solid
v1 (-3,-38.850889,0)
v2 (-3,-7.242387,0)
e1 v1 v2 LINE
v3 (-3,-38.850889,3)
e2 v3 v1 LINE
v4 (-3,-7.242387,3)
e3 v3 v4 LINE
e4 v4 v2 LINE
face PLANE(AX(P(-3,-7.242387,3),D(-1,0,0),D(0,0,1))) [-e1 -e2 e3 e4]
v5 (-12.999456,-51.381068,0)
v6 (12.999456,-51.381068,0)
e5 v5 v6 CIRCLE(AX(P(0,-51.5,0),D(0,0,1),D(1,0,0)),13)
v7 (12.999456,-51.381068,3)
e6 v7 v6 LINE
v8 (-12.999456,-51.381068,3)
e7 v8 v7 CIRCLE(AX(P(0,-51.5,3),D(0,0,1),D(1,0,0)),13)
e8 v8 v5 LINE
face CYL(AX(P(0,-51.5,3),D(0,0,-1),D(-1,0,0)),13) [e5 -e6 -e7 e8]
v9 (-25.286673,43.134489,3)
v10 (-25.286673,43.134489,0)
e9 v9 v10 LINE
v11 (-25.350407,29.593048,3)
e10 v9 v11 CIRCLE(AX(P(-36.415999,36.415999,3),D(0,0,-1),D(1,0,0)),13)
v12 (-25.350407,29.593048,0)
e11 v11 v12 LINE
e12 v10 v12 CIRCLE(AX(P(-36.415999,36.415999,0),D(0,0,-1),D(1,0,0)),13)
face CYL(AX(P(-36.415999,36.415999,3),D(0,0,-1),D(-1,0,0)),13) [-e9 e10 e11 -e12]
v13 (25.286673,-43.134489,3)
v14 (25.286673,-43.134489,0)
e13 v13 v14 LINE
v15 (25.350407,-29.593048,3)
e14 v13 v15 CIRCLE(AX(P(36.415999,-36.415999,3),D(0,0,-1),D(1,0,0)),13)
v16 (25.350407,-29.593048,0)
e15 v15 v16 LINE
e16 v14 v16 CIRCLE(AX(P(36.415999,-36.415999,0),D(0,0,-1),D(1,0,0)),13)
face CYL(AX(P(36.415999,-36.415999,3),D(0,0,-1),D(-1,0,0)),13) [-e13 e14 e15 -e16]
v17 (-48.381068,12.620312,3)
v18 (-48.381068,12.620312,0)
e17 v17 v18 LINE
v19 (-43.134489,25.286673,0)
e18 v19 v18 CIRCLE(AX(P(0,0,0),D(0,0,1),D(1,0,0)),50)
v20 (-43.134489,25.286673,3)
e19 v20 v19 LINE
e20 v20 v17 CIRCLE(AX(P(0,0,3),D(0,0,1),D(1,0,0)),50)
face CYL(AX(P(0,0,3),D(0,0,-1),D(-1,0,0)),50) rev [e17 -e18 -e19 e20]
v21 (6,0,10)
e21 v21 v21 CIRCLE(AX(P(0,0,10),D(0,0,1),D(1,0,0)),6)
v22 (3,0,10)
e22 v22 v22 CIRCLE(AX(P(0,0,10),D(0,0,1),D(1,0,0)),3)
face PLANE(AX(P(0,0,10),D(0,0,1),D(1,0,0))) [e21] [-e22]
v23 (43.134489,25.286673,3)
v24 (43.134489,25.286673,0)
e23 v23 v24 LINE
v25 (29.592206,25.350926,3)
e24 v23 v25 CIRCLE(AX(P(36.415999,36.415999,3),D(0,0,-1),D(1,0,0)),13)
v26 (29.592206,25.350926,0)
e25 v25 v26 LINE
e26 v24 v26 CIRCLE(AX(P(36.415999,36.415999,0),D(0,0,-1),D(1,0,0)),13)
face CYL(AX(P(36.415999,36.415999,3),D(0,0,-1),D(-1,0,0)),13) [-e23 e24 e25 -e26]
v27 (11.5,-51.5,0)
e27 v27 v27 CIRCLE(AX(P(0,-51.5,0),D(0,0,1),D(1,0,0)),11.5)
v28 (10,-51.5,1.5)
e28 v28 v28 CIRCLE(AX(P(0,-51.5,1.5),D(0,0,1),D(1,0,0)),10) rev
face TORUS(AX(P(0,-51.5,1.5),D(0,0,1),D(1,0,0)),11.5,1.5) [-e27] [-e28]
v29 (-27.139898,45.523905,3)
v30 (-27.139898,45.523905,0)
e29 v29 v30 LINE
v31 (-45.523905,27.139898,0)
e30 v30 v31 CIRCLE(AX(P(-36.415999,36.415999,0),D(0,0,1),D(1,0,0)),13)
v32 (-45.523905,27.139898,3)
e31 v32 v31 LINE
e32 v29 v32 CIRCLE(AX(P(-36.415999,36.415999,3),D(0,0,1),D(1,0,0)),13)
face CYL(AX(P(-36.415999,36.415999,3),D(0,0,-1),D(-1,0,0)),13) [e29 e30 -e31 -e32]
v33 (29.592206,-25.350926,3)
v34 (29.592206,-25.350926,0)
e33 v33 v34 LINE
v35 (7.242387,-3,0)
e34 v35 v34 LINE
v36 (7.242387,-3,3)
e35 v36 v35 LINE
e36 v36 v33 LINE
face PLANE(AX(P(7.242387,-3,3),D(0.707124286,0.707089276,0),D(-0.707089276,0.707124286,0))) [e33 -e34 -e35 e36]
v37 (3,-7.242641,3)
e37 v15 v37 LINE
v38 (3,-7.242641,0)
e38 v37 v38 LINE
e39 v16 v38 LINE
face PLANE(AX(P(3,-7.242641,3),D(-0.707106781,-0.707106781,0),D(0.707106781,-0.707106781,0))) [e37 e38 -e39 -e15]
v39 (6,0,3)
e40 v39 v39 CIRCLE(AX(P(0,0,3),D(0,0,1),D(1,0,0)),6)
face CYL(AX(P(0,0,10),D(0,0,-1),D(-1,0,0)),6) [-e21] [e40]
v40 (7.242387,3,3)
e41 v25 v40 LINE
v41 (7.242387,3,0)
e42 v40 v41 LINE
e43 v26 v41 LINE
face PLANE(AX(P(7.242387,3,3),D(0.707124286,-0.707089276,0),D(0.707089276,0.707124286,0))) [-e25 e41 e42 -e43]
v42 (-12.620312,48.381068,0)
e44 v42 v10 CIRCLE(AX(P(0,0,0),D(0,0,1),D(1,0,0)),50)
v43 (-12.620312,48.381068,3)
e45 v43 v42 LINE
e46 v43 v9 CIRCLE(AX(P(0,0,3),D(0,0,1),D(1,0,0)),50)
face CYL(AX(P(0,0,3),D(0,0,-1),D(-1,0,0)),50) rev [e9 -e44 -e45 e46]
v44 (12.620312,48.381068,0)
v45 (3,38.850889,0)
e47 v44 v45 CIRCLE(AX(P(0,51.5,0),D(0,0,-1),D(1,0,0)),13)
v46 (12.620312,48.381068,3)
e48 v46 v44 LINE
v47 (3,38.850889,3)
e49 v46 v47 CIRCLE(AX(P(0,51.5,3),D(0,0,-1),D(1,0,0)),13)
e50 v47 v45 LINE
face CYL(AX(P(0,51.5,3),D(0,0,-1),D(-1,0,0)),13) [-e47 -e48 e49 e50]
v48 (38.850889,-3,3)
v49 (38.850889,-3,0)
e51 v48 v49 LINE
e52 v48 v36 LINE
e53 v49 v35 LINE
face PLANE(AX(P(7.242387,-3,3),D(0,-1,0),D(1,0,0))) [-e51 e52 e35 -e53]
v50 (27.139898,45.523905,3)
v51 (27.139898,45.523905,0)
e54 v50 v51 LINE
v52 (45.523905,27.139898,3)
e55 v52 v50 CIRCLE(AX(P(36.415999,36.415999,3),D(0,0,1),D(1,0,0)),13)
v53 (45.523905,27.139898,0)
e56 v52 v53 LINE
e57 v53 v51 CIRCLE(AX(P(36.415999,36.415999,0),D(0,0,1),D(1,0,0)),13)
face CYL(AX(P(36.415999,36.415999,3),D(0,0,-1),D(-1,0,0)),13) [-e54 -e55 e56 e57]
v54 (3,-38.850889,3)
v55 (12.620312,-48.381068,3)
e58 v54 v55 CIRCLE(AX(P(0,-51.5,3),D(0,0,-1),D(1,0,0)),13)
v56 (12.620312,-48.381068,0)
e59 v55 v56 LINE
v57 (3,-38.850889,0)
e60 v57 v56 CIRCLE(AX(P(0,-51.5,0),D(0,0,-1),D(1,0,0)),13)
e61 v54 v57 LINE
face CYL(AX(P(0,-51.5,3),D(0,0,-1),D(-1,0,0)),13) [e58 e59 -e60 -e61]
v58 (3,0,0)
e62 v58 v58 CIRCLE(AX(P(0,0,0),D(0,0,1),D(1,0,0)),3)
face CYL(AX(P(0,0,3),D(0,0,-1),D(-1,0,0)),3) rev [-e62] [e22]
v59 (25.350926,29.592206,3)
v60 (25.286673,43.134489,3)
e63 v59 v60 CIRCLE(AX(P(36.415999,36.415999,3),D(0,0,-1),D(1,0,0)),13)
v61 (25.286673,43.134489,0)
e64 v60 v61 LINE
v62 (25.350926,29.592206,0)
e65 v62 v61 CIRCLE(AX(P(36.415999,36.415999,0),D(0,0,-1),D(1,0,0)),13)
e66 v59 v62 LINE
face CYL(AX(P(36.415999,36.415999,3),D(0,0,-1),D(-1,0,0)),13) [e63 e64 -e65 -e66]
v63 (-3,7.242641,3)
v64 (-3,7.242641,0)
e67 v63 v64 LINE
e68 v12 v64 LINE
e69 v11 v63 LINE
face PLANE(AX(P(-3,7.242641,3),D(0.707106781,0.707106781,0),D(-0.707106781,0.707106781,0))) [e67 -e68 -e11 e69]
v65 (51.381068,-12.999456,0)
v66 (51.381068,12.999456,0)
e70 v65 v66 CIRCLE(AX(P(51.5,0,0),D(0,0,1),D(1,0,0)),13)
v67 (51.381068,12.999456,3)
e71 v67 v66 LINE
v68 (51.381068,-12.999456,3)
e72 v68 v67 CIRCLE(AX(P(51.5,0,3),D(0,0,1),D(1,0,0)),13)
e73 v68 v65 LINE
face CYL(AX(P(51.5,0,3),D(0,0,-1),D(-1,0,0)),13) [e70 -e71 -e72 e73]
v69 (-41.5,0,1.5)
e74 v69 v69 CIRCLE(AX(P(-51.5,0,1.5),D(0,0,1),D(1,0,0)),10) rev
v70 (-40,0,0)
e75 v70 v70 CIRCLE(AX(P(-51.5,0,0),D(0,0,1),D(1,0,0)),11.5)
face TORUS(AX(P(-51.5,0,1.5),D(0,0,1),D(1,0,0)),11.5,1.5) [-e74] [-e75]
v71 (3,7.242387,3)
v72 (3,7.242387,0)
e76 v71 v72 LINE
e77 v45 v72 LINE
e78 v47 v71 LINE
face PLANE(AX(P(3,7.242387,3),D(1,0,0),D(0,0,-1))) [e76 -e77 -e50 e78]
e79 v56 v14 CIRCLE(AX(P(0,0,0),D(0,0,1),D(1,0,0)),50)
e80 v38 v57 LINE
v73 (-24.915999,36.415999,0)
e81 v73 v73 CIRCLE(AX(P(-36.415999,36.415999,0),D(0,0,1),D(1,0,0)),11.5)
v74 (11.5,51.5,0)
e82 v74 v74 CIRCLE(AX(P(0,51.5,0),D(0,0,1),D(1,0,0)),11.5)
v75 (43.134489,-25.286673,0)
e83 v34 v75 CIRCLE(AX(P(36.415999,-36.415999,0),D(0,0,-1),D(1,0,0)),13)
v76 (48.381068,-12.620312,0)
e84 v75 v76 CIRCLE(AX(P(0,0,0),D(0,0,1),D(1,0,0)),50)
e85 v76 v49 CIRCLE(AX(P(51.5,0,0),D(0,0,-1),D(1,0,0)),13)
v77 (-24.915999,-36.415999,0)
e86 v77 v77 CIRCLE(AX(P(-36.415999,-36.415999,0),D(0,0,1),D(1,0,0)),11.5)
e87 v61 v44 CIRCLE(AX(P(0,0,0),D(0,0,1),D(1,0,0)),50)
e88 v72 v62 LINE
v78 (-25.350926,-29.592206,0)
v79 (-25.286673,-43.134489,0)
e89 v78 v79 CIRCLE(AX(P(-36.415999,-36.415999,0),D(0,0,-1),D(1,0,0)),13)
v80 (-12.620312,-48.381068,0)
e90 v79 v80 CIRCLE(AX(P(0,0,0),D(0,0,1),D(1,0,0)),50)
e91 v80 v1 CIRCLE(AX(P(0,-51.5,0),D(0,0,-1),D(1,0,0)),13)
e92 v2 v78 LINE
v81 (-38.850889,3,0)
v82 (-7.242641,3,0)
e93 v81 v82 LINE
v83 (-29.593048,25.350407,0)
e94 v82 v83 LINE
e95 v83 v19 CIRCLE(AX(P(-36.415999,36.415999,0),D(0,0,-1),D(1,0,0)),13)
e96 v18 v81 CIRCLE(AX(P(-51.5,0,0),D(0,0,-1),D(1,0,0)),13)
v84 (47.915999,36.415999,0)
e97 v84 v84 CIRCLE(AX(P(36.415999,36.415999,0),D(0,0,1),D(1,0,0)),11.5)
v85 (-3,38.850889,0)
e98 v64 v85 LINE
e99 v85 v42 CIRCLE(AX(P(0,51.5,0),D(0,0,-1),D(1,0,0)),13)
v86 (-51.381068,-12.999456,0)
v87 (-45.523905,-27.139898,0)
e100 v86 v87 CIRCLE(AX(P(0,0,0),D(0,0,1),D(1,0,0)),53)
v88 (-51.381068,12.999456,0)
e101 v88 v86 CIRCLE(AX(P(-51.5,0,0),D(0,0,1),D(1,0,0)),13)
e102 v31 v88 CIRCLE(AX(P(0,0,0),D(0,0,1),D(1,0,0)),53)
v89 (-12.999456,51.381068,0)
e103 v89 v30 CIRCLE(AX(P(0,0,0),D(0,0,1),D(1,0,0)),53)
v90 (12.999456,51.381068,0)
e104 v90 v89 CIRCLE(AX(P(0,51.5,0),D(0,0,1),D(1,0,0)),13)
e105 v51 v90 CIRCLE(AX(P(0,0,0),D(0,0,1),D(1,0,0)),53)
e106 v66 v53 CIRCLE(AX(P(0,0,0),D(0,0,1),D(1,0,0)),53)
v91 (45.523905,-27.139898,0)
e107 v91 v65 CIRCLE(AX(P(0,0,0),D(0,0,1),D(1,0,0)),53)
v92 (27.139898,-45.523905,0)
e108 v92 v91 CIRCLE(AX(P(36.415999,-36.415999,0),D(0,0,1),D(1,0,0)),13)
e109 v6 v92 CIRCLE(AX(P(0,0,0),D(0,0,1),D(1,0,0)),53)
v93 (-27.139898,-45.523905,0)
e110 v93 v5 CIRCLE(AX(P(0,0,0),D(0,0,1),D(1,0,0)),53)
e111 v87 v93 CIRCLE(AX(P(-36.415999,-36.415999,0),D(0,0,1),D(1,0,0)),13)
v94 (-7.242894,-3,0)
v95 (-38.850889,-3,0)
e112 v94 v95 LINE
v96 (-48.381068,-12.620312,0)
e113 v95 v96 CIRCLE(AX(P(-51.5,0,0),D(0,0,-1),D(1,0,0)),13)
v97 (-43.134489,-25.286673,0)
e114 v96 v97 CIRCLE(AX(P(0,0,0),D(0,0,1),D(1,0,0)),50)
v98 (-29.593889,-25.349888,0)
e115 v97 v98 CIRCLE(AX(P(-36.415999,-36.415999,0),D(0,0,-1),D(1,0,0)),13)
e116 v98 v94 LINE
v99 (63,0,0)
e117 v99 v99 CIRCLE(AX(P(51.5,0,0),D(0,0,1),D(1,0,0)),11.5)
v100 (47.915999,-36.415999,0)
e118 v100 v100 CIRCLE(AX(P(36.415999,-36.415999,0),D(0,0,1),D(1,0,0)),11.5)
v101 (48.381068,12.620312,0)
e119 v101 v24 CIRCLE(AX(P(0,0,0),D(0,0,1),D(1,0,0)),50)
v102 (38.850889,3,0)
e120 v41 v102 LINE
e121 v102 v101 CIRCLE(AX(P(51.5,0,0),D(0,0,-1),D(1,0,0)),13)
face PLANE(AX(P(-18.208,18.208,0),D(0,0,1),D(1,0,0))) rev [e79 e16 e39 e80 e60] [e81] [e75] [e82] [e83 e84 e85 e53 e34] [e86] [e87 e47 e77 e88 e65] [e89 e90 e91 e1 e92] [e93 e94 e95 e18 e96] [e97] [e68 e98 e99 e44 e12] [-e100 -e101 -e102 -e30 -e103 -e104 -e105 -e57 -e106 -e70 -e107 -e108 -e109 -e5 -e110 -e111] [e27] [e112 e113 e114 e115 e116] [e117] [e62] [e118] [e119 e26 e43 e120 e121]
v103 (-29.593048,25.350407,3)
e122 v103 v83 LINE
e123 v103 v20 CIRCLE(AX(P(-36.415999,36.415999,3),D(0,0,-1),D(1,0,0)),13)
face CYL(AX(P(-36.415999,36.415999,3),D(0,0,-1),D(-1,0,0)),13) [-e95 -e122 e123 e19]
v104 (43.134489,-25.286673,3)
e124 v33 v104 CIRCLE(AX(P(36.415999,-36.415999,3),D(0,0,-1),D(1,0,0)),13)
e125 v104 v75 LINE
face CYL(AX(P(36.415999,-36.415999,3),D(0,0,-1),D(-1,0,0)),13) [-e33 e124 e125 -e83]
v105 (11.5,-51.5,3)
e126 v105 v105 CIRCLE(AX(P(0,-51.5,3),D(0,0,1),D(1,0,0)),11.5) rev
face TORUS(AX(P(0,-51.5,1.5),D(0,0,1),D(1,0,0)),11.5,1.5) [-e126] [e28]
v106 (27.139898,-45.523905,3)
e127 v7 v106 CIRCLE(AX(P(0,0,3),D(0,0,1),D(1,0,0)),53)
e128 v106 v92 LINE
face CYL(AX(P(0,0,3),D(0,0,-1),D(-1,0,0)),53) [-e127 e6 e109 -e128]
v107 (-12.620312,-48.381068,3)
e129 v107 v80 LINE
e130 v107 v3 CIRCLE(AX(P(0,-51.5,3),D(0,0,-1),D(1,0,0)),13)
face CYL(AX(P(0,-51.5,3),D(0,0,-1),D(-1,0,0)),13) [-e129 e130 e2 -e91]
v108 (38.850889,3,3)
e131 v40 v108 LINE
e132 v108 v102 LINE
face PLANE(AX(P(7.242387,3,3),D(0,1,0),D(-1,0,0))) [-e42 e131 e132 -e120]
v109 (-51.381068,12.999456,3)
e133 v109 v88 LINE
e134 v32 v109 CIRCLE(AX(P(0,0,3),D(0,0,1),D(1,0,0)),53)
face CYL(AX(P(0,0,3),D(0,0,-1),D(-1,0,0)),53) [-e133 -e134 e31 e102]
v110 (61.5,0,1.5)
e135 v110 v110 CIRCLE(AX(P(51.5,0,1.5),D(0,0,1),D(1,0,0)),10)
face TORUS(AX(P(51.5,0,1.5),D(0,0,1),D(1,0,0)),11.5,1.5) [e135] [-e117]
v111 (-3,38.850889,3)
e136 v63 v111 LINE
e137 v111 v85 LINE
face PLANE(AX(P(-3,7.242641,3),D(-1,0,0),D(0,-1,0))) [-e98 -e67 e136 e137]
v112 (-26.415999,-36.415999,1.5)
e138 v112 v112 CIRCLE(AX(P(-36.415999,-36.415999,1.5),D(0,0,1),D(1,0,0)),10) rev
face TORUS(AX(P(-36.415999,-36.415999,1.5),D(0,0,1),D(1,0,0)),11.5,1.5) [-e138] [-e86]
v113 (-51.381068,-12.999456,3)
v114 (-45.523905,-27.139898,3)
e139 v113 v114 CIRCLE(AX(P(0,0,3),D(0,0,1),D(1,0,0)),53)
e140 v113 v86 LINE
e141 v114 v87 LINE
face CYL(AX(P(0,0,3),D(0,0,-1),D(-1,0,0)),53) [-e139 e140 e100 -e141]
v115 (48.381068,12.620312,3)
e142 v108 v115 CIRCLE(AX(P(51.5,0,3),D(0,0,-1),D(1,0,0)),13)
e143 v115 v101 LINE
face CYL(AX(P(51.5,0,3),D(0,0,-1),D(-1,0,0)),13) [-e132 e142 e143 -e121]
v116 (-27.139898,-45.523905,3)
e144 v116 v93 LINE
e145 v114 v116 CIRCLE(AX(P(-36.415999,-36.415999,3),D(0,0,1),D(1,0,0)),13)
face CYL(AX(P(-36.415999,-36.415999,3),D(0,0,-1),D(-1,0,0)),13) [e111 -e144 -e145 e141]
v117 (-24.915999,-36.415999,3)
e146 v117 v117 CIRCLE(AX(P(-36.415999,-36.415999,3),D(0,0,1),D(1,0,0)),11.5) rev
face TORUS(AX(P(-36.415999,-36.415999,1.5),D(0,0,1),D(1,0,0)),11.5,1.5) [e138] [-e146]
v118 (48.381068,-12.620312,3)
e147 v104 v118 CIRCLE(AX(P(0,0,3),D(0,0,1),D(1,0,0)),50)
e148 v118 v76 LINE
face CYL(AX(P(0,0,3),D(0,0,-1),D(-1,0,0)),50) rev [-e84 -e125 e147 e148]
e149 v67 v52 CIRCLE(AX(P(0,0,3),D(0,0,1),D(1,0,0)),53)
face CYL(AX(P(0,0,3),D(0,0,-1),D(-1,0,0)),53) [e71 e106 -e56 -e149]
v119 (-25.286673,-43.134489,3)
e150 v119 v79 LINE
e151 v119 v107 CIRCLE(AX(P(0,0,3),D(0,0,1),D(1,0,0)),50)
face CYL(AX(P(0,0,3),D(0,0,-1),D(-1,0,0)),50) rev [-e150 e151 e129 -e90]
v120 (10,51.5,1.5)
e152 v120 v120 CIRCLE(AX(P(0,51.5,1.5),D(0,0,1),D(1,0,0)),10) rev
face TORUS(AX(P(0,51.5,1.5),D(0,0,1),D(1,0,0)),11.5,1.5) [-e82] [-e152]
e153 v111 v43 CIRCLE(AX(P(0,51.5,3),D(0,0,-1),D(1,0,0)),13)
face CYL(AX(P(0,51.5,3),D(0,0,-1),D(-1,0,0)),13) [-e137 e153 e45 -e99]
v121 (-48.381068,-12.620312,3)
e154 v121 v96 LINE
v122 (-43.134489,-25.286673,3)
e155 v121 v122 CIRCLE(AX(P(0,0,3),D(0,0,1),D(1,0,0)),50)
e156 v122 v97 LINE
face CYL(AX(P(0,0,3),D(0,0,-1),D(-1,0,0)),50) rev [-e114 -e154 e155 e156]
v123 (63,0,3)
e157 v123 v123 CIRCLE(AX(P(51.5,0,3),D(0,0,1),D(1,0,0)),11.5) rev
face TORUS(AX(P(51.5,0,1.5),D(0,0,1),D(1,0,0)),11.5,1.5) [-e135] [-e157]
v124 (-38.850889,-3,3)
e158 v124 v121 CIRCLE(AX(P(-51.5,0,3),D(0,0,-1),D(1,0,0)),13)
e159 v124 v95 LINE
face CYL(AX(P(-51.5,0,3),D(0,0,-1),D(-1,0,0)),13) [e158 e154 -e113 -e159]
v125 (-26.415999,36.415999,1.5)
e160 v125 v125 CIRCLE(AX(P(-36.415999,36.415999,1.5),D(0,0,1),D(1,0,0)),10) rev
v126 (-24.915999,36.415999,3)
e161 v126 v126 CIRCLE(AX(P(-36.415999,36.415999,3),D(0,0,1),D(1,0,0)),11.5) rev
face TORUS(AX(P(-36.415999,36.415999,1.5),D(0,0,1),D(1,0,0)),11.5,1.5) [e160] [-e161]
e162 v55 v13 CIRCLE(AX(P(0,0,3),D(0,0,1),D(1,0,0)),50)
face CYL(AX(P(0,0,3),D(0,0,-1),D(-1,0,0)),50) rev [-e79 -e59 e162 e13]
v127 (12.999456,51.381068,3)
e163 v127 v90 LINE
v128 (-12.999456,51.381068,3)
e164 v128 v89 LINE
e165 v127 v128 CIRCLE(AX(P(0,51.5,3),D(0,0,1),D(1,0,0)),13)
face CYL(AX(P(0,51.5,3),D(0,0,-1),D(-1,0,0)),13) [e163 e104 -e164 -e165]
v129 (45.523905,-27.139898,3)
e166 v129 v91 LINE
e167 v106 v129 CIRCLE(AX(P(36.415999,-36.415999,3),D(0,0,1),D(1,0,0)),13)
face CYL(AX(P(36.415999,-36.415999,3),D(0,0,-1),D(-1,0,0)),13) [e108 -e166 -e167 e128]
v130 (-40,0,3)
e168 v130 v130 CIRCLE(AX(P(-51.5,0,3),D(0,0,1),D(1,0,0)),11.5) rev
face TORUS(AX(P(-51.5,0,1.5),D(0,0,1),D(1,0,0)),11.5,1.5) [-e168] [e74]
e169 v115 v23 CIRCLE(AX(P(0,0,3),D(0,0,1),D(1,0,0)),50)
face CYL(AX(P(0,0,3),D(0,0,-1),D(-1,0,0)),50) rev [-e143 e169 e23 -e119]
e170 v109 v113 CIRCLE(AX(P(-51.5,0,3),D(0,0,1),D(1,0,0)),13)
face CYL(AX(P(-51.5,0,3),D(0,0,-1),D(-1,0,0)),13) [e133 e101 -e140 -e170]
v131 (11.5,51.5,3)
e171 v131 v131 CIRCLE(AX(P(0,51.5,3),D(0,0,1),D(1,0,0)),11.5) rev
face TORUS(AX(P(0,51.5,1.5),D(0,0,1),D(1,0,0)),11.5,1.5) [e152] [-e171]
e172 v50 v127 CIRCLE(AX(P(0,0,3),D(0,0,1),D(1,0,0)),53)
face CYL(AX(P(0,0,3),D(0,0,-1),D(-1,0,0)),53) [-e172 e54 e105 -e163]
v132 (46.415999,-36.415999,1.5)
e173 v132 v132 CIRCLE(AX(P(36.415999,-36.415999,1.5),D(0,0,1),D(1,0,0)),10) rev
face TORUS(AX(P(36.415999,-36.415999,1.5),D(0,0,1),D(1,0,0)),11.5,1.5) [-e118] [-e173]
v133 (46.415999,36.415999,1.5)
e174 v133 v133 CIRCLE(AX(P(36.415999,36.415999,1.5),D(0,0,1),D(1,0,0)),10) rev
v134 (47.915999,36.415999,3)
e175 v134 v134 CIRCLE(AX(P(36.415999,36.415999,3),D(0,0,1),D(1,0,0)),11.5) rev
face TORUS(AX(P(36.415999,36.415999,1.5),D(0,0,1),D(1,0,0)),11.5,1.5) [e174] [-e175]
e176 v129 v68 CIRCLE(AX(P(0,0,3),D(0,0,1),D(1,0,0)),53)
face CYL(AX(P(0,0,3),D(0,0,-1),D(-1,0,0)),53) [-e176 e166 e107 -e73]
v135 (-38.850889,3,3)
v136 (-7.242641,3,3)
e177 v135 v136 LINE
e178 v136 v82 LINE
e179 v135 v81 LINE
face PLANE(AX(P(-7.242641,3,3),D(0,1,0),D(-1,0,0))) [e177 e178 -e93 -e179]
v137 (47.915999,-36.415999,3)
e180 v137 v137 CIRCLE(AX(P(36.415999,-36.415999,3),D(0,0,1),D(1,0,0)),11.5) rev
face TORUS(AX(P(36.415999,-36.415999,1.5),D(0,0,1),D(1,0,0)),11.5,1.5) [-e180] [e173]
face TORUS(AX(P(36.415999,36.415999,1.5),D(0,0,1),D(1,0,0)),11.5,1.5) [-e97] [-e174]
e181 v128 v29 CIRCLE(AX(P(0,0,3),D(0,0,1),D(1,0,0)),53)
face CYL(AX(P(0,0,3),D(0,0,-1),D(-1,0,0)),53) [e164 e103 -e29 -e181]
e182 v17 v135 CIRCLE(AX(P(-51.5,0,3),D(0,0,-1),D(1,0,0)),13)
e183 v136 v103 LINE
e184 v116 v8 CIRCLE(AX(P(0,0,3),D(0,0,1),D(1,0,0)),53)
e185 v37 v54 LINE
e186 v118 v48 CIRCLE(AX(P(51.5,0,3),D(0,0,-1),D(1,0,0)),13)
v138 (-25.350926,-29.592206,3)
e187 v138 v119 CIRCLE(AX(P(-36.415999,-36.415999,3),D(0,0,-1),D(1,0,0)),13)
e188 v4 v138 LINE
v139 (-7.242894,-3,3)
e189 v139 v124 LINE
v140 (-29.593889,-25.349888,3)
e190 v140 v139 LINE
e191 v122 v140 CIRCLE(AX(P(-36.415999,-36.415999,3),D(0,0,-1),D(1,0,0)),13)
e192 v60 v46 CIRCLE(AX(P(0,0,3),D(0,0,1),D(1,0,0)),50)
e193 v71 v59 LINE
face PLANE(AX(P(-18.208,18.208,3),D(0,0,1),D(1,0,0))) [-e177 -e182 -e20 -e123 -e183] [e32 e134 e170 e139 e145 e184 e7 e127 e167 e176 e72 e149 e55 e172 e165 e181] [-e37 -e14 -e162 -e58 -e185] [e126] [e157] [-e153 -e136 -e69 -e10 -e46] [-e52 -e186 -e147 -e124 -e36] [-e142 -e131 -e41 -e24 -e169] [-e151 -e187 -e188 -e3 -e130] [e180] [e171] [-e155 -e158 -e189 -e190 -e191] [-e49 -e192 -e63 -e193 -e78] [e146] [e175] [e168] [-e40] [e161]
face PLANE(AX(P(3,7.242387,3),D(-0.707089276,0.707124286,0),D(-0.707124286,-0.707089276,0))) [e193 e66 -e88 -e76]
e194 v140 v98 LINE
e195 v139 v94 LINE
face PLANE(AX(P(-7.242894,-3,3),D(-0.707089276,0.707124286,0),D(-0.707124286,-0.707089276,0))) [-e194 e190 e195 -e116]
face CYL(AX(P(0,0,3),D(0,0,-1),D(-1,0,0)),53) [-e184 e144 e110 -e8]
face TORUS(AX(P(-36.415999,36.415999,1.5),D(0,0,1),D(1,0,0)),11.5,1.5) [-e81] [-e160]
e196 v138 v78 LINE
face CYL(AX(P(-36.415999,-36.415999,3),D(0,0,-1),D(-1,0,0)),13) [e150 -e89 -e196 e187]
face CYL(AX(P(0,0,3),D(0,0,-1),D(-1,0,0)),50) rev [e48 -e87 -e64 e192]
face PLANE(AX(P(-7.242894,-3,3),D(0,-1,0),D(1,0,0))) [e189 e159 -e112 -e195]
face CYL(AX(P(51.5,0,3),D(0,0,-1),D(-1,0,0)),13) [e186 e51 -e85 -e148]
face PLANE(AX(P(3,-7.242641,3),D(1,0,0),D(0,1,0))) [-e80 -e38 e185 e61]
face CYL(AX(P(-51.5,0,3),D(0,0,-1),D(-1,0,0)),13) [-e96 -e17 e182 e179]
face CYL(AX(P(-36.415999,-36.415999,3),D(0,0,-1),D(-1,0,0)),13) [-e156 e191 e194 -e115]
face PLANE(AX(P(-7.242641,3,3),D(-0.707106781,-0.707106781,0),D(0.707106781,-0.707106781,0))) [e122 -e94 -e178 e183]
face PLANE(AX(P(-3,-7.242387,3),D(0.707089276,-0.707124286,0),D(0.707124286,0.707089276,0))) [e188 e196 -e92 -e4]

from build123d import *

# Parameters (mm, degrees)
CROQUIS1_R              = 3
CROQUIS1_R_2            = 10
SALIENTE_EXTRUIR2_DEPTH = 3
REDONDEO1_R             = 1.5
REDONDEO2_R             = 1.5
REDONDEO3_R             = 1.5
REDONDEO4_R             = 1.5
REDONDEO5_R             = 1.5
REDONDEO6_R             = 1.5
REDONDEO7_R             = 1.5
REDONDEO8_R             = 1.5
REDONDEO9_R             = 1.5
REDONDEO10_R            = 1.5
REDONDEO11_R            = 1.5
REDONDEO12_R            = 1.5
REDONDEO13_R            = 1.5
REDONDEO14_R            = 1.5
REDONDEO15_R            = 1.5
REDONDEO16_R            = 1.5
CROQUIS18_R             = 6
CROQUIS18_R_2           = 3
SALIENTE_EXTRUIR5_DEPTH = 7


with BuildPart() as part:
    # Croquis1 → Saliente-Extruir2 (new body)
    with BuildSketch(Plane.XY):
        with BuildLine():
            ThreePointArc((-45.523905039, 27.139898121), (-48.965615223, 20.282221915), (-51.381067961, 12.999455957))
            ThreePointArc((-51.381067961, 12.999455957), (-64.5, 0), (-51.381067961, -12.999455957))
            ThreePointArc((-51.381067961, -12.999455957), (-48.965615223, -20.282221915), (-45.523905039, -27.139898121))
            ThreePointArc((-45.523905039, -27.139898121), (-45.608387387, -45.608387387), (-27.139898121, -45.523905039))
            ThreePointArc((-27.139898121, -45.523905039), (-20.282221915, -48.965615223), (-12.999455957, -51.381067961))
            ThreePointArc((-12.999455957, -51.381067961), (0, -64.5), (12.999455957, -51.381067961))
            ThreePointArc((12.999455957, -51.381067961), (20.282221915, -48.965615223), (27.139898121, -45.523905039))
            ThreePointArc((27.139898121, -45.523905039), (45.608387387, -45.608387387), (45.523905039, -27.139898121))
            ThreePointArc((45.523905039, -27.139898121), (48.965615223, -20.282221915), (51.381067961, -12.999455957))
            ThreePointArc((51.381067961, -12.999455957), (64.5, 0), (51.381067961, 12.999455957))
            ThreePointArc((51.381067961, 12.999455957), (48.965615223, 20.282221915), (45.523905039, 27.139898121))
            ThreePointArc((45.523905039, 27.139898121), (45.608387387, 45.608387387), (27.139898121, 45.523905039))
            ThreePointArc((27.139898121, 45.523905039), (20.282221915, 48.965615223), (12.999455957, 51.381067961))
            ThreePointArc((12.999455957, 51.381067961), (0, 64.5), (-12.999455957, 51.381067961))
            ThreePointArc((-12.999455957, 51.381067961), (-20.282221915, 48.965615223), (-27.139898121, 45.523905039))
            ThreePointArc((-27.139898121, 45.523905039), (-45.608387387, 45.608387387), (-45.523905039, 27.139898121))
        make_face()
        Circle(CROQUIS1_R, mode=Mode.SUBTRACT)
        with Locations((0, 51.5)):
            Circle(CROQUIS1_R_2, mode=Mode.SUBTRACT)
        with Locations((-36.415999231, 36.415999231)):
            Circle(CROQUIS1_R_2, mode=Mode.SUBTRACT)
        with Locations((-51.5, 0)):
            Circle(CROQUIS1_R_2, mode=Mode.SUBTRACT)
        with Locations((-36.415999231, -36.415999231)):
            Circle(CROQUIS1_R_2, mode=Mode.SUBTRACT)
        with Locations((0, -51.5)):
            Circle(CROQUIS1_R_2, mode=Mode.SUBTRACT)
        with Locations((36.415999231, -36.415999231)):
            Circle(CROQUIS1_R_2, mode=Mode.SUBTRACT)
        with Locations((51.5, 0)):
            Circle(CROQUIS1_R_2, mode=Mode.SUBTRACT)
        with Locations((36.415999231, 36.415999231)):
            Circle(CROQUIS1_R_2, mode=Mode.SUBTRACT)
        with BuildLine():
            Line((-7.242640687, 3), (-38.850889359, 3))
            ThreePointArc((-38.850889359, 3), (-42.264449614, 9.149022301), (-48.381067961, 12.620311523))
            ThreePointArc((-48.381067961, 12.620311523), (-46.193976626, 19.134171618), (-43.134489095, 25.286673378))
            ThreePointArc((-43.134489095, 25.286673378), (-36.354814635, 23.416143215), (-29.593047665, 25.350406978))
            Line((-29.593047665, 25.350406978), (-7.242640687, 3))
        make_face(mode=Mode.SUBTRACT)
        with BuildLine():
            Line((-7.242894262, -3), (-29.593889088, -25.349888207))
            ThreePointArc((-29.593889088, -25.349888207), (-36.355308876, -23.416140898), (-43.134489095, -25.286673378))
            ThreePointArc((-43.134489095, -25.286673378), (-46.193976626, -19.134171618), (-48.381067961, -12.620311523))
            ThreePointArc((-48.381067961, -12.620311523), (-42.264449614, -9.149022301), (-38.850889359, -3))
            Line((-38.850889359, -3), (-7.242894262, -3))
        make_face(mode=Mode.SUBTRACT)
        with BuildLine():
            Line((-3, -7.242387126), (-3, -38.850889359))
            ThreePointArc((-3, -38.850889359), (-9.149022301, -42.264449614), (-12.620311523, -48.381067961))
            ThreePointArc((-12.620311523, -48.381067961), (-19.134171618, -46.193976626), (-25.286673378, -43.134489095))
            ThreePointArc((-25.286673378, -43.134489095), (-23.41614555, -36.35432041), (-25.350925796, -29.592206306))
            Line((-25.350925796, -29.592206306), (-3, -7.242387126))
        make_face(mode=Mode.SUBTRACT)
        with BuildLine():
            Line((3, -7.242640687), (25.350406978, -29.593047665))
            ThreePointArc((25.350406978, -29.593047665), (23.416143215, -36.354814635), (25.286673378, -43.134489095))
            ThreePointArc((25.286673378, -43.134489095), (19.134171618, -46.193976626), (12.620311523, -48.381067961))
            ThreePointArc((12.620311523, -48.381067961), (9.149022301, -42.264449614), (3, -38.850889359))
            Line((3, -38.850889359), (3, -7.242640687))
        make_face(mode=Mode.SUBTRACT)
        with BuildLine():
            Line((7.242387126, -3), (38.850889359, -3))
            ThreePointArc((38.850889359, -3), (42.264449614, -9.149022301), (48.381067961, -12.620311523))
            ThreePointArc((48.381067961, -12.620311523), (46.193976626, -19.134171618), (43.134489095, -25.286673378))
            ThreePointArc((43.134489095, -25.286673378), (36.35432041, -23.41614555), (29.592206307, -25.350925796))
            Line((29.592206307, -25.350925796), (7.242387126, -3))
        make_face(mode=Mode.SUBTRACT)
        with BuildLine():
            Line((7.242387126, 3), (29.592206307, 25.350925796))
            ThreePointArc((29.592206307, 25.350925796), (36.35432041, 23.41614555), (43.134489095, 25.286673378))
            ThreePointArc((43.134489095, 25.286673378), (46.193976626, 19.134171618), (48.381067961, 12.620311523))
            ThreePointArc((48.381067961, 12.620311523), (42.264449614, 9.149022301), (38.850889359, 3))
            Line((38.850889359, 3), (7.242387126, 3))
        make_face(mode=Mode.SUBTRACT)
        with BuildLine():
            Line((3, 7.242387127), (3, 38.850889359))
            ThreePointArc((3, 38.850889359), (9.149022301, 42.264449614), (12.620311523, 48.381067961))
            ThreePointArc((12.620311523, 48.381067961), (19.134171618, 46.193976626), (25.286673378, 43.134489095))
            ThreePointArc((25.286673378, 43.134489095), (23.41614555, 36.35432041), (25.350925796, 29.592206307))
            Line((25.350925796, 29.592206307), (3, 7.242387127))
        make_face(mode=Mode.SUBTRACT)
        with BuildLine():
            Line((-3, 7.242640687), (-25.350406978, 29.593047665))
            ThreePointArc((-25.350406978, 29.593047665), (-23.416143215, 36.354814635), (-25.286673378, 43.134489095))
            ThreePointArc((-25.286673378, 43.134489095), (-19.134171618, 46.193976626), (-12.620311523, 48.381067961))
            ThreePointArc((-12.620311523, 48.381067961), (-9.149022301, 42.264449614), (-3, 38.850889359))
            Line((-3, 38.850889359), (-3, 7.242640687))
        make_face(mode=Mode.SUBTRACT)
    extrude(amount=SALIENTE_EXTRUIR2_DEPTH)

    # Redondeo1
    redondeo1_edges = [part.edges().sort_by_distance(p)[0] for p in [
        (41.5, 0, 3),
    ]]
    fillet(redondeo1_edges, radius=REDONDEO1_R)

    # Redondeo2
    redondeo2_edges = [part.edges().sort_by_distance(p)[0] for p in [
        (41.5, 0, 0),
    ]]
    fillet(redondeo2_edges, radius=REDONDEO2_R - 0.0001)  # a hair under: the kernel refuses the full size

    # Redondeo3
    redondeo3_edges = [part.edges().sort_by_distance(p)[0] for p in [
        (26.415999231, -36.415999231, 0),
    ]]
    fillet(redondeo3_edges, radius=REDONDEO3_R)

    # Redondeo4
    redondeo4_edges = [part.edges().sort_by_distance(p)[0] for p in [
        (26.415999231, -36.415999231, 3),
    ]]
    fillet(redondeo4_edges, radius=REDONDEO4_R - 0.0001)  # a hair under: the kernel refuses the full size

    # Redondeo5
    redondeo5_edges = [part.edges().sort_by_distance(p)[0] for p in [
        (-10, -51.5, 0),
    ]]
    fillet(redondeo5_edges, radius=REDONDEO5_R)

    # Redondeo6
    redondeo6_edges = [part.edges().sort_by_distance(p)[0] for p in [
        (-10, -51.5, 3),
    ]]
    fillet(redondeo6_edges, radius=REDONDEO6_R - 0.0001)  # a hair under: the kernel refuses the full size

    # Redondeo7
    redondeo7_edges = [part.edges().sort_by_distance(p)[0] for p in [
        (-46.415999231, -36.415999231, 0),
    ]]
    fillet(redondeo7_edges, radius=REDONDEO7_R)

    # Redondeo8
    redondeo8_edges = [part.edges().sort_by_distance(p)[0] for p in [
        (-46.415999231, -36.415999231, 3),
    ]]
    fillet(redondeo8_edges, radius=REDONDEO8_R - 0.0001)  # a hair under: the kernel refuses the full size

    # Redondeo9
    redondeo9_edges = [part.edges().sort_by_distance(p)[0] for p in [
        (-61.5, 0, 0),
    ]]
    fillet(redondeo9_edges, radius=REDONDEO9_R)

    # Redondeo10
    redondeo10_edges = [part.edges().sort_by_distance(p)[0] for p in [
        (-61.5, 0, 3),
    ]]
    fillet(redondeo10_edges, radius=REDONDEO10_R - 0.0001)  # a hair under: the kernel refuses the full size

    # Redondeo11
    redondeo11_edges = [part.edges().sort_by_distance(p)[0] for p in [
        (-46.415999231, 36.415999231, 0),
    ]]
    fillet(redondeo11_edges, radius=REDONDEO11_R)

    # Redondeo12
    redondeo12_edges = [part.edges().sort_by_distance(p)[0] for p in [
        (-46.415999231, 36.415999231, 3),
    ]]
    fillet(redondeo12_edges, radius=REDONDEO12_R - 0.0001)  # a hair under: the kernel refuses the full size

    # Redondeo13
    redondeo13_edges = [part.edges().sort_by_distance(p)[0] for p in [
        (-10, 51.5, 0),
    ]]
    fillet(redondeo13_edges, radius=REDONDEO13_R)

    # Redondeo14
    redondeo14_edges = [part.edges().sort_by_distance(p)[0] for p in [
        (-10, 51.5, 3),
    ]]
    fillet(redondeo14_edges, radius=REDONDEO14_R - 0.0001)  # a hair under: the kernel refuses the full size

    # Redondeo15
    redondeo15_edges = [part.edges().sort_by_distance(p)[0] for p in [
        (26.415999231, 36.415999231, 0),
    ]]
    fillet(redondeo15_edges, radius=REDONDEO15_R)

    # Redondeo16
    redondeo16_edges = [part.edges().sort_by_distance(p)[0] for p in [
        (26.415999231, 36.415999231, 3),
    ]]
    fillet(redondeo16_edges, radius=REDONDEO16_R - 0.0001)  # a hair under: the kernel refuses the full size

    # Croquis18 → Saliente-Extruir5 (add)
    with BuildSketch(Plane.XY.offset(3)):
        Circle(CROQUIS18_R)
        Circle(CROQUIS18_R_2, mode=Mode.SUBTRACT)
    extrude(amount=SALIENTE_EXTRUIR5_DEPTH)


solid = part.part
